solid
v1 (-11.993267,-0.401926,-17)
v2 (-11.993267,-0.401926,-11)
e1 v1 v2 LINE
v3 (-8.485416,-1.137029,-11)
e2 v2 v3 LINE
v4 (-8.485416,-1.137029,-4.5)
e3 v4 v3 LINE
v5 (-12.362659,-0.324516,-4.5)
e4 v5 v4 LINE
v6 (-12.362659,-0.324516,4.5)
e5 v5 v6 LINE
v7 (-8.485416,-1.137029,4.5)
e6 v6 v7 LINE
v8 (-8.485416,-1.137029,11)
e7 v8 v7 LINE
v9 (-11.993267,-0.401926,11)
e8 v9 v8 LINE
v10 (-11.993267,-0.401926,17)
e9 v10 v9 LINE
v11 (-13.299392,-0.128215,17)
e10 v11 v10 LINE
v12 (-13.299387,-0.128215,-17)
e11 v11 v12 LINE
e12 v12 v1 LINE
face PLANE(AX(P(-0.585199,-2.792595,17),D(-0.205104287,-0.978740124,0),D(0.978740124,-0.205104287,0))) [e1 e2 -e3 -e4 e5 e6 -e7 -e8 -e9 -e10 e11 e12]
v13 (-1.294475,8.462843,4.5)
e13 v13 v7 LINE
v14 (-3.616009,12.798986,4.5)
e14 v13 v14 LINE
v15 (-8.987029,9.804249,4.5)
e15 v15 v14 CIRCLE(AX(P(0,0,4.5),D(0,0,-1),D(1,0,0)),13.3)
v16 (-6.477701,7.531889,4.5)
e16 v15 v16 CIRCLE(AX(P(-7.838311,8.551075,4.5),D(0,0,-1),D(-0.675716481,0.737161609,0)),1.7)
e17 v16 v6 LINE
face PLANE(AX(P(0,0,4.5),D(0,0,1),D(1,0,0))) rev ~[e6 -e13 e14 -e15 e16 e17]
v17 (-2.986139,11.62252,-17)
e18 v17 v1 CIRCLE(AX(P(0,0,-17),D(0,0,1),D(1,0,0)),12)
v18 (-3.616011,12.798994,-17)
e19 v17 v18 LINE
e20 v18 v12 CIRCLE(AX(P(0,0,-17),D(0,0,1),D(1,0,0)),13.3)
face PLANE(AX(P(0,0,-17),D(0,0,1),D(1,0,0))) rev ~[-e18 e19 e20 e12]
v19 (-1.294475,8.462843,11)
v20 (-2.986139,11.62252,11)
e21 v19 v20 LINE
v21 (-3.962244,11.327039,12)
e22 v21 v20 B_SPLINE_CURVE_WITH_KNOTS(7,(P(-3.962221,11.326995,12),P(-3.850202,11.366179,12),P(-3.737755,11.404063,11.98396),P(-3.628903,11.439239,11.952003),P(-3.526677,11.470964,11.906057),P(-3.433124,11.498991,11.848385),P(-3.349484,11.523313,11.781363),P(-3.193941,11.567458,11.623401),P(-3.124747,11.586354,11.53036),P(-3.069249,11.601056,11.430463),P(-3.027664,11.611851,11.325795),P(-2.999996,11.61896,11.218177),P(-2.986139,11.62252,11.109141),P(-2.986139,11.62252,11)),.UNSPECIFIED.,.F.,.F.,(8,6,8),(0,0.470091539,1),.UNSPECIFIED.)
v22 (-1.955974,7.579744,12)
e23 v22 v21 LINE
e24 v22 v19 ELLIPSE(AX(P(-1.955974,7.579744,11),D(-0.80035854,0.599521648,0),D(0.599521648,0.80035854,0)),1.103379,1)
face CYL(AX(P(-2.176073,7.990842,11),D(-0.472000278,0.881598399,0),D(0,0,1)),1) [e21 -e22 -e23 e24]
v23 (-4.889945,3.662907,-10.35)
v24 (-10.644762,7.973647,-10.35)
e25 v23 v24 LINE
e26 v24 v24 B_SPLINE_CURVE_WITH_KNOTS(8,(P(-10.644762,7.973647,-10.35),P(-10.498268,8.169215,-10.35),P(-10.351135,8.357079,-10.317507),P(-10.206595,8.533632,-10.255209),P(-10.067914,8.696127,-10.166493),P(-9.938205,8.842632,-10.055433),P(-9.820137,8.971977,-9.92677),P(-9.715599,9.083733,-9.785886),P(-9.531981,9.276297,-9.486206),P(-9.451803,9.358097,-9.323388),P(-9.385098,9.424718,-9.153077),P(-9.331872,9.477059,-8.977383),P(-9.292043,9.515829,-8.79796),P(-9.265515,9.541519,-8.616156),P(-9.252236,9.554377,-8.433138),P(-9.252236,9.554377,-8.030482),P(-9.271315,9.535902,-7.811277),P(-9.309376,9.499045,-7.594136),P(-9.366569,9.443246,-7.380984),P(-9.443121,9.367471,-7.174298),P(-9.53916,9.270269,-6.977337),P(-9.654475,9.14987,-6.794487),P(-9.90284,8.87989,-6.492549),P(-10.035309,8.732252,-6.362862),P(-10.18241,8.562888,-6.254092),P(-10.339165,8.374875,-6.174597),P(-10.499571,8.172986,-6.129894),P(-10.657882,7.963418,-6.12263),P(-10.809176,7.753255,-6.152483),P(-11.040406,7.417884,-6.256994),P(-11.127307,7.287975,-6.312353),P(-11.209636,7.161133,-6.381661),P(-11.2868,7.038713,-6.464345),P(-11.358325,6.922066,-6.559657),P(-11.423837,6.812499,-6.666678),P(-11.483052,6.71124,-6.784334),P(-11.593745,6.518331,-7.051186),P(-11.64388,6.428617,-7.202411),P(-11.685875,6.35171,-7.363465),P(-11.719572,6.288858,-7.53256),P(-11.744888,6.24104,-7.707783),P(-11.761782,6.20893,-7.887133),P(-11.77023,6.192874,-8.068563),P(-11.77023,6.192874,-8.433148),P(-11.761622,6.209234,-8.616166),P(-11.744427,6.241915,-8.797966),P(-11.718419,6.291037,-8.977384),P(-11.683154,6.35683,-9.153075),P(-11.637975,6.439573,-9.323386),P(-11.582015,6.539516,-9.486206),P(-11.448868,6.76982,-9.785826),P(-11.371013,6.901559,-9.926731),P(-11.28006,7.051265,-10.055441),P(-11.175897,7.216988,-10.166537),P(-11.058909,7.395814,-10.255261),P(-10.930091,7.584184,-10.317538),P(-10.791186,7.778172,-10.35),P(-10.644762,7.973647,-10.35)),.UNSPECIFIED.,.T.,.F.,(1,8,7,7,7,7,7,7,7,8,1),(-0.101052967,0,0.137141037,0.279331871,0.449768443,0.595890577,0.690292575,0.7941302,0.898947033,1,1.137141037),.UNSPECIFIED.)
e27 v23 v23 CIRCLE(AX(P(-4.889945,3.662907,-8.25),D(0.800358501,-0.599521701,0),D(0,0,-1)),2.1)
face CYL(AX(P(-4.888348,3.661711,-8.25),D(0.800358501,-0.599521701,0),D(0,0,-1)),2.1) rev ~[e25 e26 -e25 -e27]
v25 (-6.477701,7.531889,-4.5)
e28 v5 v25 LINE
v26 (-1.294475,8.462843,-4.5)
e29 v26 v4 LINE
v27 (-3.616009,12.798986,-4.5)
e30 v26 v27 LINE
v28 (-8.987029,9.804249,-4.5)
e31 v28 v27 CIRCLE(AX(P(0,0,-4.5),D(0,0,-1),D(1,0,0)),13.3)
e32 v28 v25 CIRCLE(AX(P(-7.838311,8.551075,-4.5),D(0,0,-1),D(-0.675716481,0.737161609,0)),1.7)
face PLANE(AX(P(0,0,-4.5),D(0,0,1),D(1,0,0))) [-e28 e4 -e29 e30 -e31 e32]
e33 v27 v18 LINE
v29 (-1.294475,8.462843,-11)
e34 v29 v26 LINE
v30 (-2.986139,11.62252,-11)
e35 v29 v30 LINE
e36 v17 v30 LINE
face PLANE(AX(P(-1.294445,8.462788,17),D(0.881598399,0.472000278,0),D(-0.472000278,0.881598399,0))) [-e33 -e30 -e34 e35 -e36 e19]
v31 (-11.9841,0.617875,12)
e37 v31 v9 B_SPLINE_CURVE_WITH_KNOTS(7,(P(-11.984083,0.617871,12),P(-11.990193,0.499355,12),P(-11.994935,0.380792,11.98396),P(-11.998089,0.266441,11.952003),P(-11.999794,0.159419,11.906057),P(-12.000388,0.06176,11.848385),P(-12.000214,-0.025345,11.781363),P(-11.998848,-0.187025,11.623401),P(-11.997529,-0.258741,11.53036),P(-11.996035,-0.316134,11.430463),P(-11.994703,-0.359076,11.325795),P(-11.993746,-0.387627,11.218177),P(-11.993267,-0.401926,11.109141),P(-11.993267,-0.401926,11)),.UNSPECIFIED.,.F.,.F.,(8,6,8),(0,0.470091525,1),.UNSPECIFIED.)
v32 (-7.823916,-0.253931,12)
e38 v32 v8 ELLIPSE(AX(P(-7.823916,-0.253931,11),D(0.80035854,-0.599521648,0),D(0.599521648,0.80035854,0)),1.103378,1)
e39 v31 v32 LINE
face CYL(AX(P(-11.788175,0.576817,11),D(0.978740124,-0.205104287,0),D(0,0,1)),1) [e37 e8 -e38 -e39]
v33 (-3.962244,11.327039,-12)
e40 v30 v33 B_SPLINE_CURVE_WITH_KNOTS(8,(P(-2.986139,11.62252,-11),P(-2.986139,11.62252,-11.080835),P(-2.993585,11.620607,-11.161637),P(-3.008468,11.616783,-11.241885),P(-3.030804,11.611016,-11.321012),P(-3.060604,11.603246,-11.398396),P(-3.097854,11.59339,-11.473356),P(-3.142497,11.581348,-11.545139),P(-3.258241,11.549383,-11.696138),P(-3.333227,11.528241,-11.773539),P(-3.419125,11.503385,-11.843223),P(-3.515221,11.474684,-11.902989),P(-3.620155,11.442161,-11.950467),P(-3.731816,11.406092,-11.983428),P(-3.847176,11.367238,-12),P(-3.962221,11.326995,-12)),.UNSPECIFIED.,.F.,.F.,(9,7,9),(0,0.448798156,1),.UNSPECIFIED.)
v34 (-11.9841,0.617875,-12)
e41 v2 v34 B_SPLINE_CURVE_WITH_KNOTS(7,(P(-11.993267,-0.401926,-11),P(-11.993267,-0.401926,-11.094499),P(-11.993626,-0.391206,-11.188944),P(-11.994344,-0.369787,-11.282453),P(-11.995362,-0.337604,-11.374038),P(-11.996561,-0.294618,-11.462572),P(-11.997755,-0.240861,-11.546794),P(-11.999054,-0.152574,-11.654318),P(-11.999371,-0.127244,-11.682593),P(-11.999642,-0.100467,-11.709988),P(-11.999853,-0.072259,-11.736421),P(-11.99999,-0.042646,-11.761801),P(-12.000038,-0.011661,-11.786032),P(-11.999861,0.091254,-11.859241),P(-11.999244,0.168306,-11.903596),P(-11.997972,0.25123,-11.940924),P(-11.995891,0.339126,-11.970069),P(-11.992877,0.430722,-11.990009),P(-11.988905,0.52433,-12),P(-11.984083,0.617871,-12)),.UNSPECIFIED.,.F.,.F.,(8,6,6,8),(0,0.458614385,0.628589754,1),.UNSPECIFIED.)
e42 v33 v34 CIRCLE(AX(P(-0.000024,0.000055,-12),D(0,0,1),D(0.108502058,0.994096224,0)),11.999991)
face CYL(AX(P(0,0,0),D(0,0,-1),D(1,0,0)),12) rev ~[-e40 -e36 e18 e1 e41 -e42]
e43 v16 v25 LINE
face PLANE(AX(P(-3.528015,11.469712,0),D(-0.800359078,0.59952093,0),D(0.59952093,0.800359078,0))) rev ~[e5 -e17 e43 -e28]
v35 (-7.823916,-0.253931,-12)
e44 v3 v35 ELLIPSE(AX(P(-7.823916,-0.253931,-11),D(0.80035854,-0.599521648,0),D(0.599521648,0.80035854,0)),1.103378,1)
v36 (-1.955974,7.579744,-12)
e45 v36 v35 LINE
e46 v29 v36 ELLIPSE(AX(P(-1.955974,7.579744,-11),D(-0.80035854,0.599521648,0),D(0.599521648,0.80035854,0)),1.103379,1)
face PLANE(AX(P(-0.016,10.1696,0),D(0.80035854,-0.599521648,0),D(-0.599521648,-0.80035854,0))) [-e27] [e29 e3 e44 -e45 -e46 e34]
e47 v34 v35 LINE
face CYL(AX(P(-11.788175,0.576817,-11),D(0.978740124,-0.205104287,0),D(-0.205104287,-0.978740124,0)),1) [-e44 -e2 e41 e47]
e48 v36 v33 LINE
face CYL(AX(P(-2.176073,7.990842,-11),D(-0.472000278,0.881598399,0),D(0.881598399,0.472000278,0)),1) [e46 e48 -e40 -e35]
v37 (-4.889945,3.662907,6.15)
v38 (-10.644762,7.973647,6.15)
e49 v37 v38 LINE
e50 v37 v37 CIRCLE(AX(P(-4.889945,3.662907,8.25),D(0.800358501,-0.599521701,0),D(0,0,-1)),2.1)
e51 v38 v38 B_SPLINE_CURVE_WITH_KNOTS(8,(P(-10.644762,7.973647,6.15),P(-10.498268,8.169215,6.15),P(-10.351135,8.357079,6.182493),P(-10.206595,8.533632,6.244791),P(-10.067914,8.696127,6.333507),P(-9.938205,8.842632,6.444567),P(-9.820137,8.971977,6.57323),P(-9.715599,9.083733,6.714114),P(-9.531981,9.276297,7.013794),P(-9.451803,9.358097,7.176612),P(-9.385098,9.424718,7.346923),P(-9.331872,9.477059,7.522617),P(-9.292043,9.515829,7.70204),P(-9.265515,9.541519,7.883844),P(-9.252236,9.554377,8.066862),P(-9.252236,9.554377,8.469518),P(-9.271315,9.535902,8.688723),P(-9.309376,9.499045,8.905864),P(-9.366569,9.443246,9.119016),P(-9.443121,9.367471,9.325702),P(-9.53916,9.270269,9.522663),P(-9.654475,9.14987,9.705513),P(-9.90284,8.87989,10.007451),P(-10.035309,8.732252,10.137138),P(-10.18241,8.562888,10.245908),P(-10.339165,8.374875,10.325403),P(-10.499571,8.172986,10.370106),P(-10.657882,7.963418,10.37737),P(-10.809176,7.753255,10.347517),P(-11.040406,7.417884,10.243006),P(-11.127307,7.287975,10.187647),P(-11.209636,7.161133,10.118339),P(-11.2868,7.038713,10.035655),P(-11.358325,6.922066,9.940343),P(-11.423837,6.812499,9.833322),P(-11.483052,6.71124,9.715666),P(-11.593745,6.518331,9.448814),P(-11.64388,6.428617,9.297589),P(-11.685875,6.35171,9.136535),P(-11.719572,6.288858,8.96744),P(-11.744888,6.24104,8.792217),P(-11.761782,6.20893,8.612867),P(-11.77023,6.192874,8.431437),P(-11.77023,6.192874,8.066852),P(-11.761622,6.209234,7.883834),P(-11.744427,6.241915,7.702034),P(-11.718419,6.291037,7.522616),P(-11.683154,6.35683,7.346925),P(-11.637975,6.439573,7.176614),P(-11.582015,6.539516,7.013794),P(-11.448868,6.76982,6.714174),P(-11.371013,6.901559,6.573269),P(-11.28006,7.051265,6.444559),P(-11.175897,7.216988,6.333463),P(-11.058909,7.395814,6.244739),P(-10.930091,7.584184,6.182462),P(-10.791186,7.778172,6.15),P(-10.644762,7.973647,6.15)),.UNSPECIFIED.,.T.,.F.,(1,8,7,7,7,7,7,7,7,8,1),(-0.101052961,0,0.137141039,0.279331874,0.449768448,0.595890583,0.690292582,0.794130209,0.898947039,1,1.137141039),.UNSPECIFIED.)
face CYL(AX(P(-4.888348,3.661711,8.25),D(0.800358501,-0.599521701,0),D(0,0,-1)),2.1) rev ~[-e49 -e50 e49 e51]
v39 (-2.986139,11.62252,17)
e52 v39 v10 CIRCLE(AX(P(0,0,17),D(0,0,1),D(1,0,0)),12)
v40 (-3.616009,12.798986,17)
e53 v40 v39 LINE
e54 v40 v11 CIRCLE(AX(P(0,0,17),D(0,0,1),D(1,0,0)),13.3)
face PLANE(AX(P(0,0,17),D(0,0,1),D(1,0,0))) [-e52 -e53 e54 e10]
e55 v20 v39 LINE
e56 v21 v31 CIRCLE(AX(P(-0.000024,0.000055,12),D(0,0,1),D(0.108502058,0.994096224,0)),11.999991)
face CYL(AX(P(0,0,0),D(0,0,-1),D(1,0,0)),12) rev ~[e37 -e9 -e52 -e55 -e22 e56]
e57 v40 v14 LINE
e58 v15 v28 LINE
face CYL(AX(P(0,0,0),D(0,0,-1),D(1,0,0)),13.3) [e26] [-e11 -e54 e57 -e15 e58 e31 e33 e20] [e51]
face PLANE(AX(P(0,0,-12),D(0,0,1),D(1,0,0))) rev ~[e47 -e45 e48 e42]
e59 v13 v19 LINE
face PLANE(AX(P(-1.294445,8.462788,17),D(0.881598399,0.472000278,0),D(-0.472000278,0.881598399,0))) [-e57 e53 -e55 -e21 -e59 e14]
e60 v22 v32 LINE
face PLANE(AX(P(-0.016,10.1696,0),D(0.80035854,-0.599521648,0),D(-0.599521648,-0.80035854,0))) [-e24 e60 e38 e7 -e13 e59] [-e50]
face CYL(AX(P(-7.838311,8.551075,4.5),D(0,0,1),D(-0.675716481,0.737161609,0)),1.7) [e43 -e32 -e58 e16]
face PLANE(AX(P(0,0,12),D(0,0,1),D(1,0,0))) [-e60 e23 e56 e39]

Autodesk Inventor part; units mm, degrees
ref_plane "YZ Plane" through (0, 0, 0) normal (1, 0, 0) x (0, 1, 0)
ref_plane "XZ Plane" through (0, 0, 0) normal (0, 1, 0) x (-1, 0, 0)
ref_plane "XY Plane" through (0, 0, 0) normal (0, 0, 1) x (1, 0, 0)
sketch "Эскиз1" plane through (0, 0, 0) normal (0, 0, 1) x (1, 0, 0)
  arc A0 (-0.8919, 11.7662) -> (-11.5424, -2.4521) centre (0, 0) ccw projected
  line L0 (-0.016, 10.1696) -> (-9.7639, -2.8438) projected
  line L1 (-9.7639, -2.8438) -> (-12.4663, -6.4515) projected
  arc A1 (-0.8919, 11.7662) -> (-11.5424, -2.4521) centre (0, 0) ccw projected
  line L2 (2.8533, 14) -> (-0.016, 10.1696) projected
  arc A2 (-8.5159, 10.4752) -> (-12.3517, -5.4484) centre (0, 0) ccw projected
  circle A3 centre (0, 0) radius 13.5
  circle A4 centre (0, 0) radius 11.8
  circle A5 centre (0, 0) radius 13.3
  circle A6 centre (0, 0) radius 12
  line L3 (-8.1467, 14) -> (2.8533, 14) projected
  line L4 (-8.1467, 14) -> (-8.1467, 11.2511) projected
  arc A7 (-11.5424, -2.4521) -> (-9.7639, -2.8438) centre (-10.5642, -2.2443) ccw projected
  arc A8 (-0.016, 10.1696) -> (-0.8919, 11.7662) centre (-0.8163, 10.7691) ccw projected
  arc A9 (-8.5159, 10.4752) -> (-8.1467, 11.2511) centre (-9.1467, 11.2511) ccw projected
  arc A10 (-12.4663, -6.4515) -> (-12.3517, -5.4484) centre (-13.2667, -5.852) ccw projected
  arc A11 (-11.5424, -2.4521) -> (-9.7639, -2.8438) centre (-10.5642, -2.2443) ccw projected
  arc A12 (-0.016, 10.1696) -> (-0.8919, 11.7662) centre (-0.8163, 10.7691) ccw projected
  point P0 (1.1623, 11.7426)
  point P1 (2.3273, 13.2979)
  point P2 (-11.0819, -4.6034)
  point P3 (1.302, 11.9292)
  point P4 (2.1926, 13.118)
  point P5 (-11.9725, -5.7923)
  dimension "d1" = 0.2
  dimension "d2" = 0.2
extrude "Выдавливание1" add sketch "Эскиз1" along normal mid plane 34 contours A6 L1 A5 L2 picked at (-9.9488, 8.0267)
sketch "Эскиз2" plane through (0, 0, 0) normal (0, 0, 1) x (1, 0, 0)
  arc A0 (-0.8919, 11.7662) -> (-11.5424, -2.4521) centre (0, 0) ccw projected
  line L0 (-0.016, 10.1696) -> (-9.7639, -2.8438) projected
  arc A1 (1.302, 11.9292) -> (-11.0819, -4.6034) centre (0, 0) ccw projected
  line L1 (-14.5944, -9.2926) -> (2.8533, 14) projected
  arc A2 (-11.5424, -2.4521) -> (-9.7639, -2.8438) centre (-10.5642, -2.2443) ccw projected
  arc A3 (-0.016, 10.1696) -> (-0.8919, 11.7662) centre (-0.8163, 10.7691) ccw projected
  point P0 (1.1623, 11.7426)
  point P1 (-10.9422, -4.4168)
extrude "Выдавливание2" add sketch "Эскиз2" along normal mid plane 24
sketch "Эскиз3" plane through (0, 0, 0) normal (0, 0, 1) x (1, 0, 0)
  arc A0 (1.302, 11.9292) -> (-11.0819, -4.6034) centre (0, 0) ccw projected
  line L0 (-11.0819, -4.6034) -> (1.302, 11.9292) projected
  arc A1 (2.1926, 13.118) -> (-11.9725, -5.7923) centre (0, 0) ccw projected
  arc A2 (-8.5159, 10.4752) -> (-12.3517, -5.4484) centre (0, 0) ccw projected
  line L1 (1.302, 11.9292) -> (-11.0819, -4.6034) projected
  line L2 (-4.8899, 3.6629) -> (-10.8048, 8.0935)
  line L3 (-10.8048, 8.0935) -> (-7.6034, 5.6955)
  line L4 (-12.0998, -0.3072) -> (-3.107, 11.6981)
  line L5 (-3.107, 11.6981) -> (0.0944, 9.3001)
  line L6 (0.0944, 9.3001) -> (-8.8984, -2.7053)
  line L7 (-8.8984, -2.7053) -> (-12.0998, -0.3072)
  line L8 (-12.3798, -0.3474) -> (-3.1472, 11.9781)
  line L9 (-3.1472, 11.9781) -> (0.3744, 9.3402)
  line L10 (0.3744, 9.3402) -> (-8.8582, -2.9853)
  line L11 (-8.8582, -2.9853) -> (-12.3798, -0.3474)
  point P0 (-4.402, 3.2974)
  dimension "d7" = 4
  dimension "d8" = 15
  dimension "d9" = 4
  dimension "d12" = 0.2
  dimension "d13" = 15.4
extrude "Выдавливание3" cut sketch "Эскиз3" along normal mid plane 9 contours L9 L0 L5 A0 | A0 L5 L4 L8 L9 | L9 L10 L11 L0 L7 L6 L5 | L5 L0 L2 L4 A0 | A0 L4 L5 | L5 L6 L7 L0 | L4 L2 L8 A0 | L0 L7 A0 L4 L2 | L4 A0 L8 L2 | L0 L11 A0 L7 | L4 L7 A0 L11 L8 | A0 L7 L4
sketch "Эскиз5" plane through (0, 0, 17) normal (0, 0, 1) x (1, 0, 0)
  arc A0 (2.1926, 13.118) -> (-11.9725, -5.7923) centre (0, 0) ccw projected
  circle A1 centre (0, 0) radius 13.3
  line L0 (2.8533, 17.048) -> (2.8533, 14) projected
  circle A2 centre (0, 0) radius 2.8533
  line L1 (9.8804, -12.4095) -> (-5.8229, 16.921)
  line L2 (0, 0) -> (2.5154, 1.3467)
  line L3 (-19.8346, 1.2413) -> (17.8745, -6.661)
  line L4 (0, 0) -> (-0.5852, -2.7926)
  line L5 (0, 0) -> (-4.8899, 3.6629)
  line L6 (-0.2736, 9.8256) -> (-9.5063, -2.4999) projected
  point P0 (5.4035, -4.0476)
  point P1 (-13.2994, -0.1282)
  point P2 (-11.9725, -5.7923)
  point P3 (8.6469, -10.1055)
  point P4 (12.1289, -5.457)
  point P5 (-3.6161, 12.799)
  dimension "d19" = 115
  dimension "d20" = 115
extrude "Выдавливание5" cut sketch "Эскиз5" against normal blind 40 contours A1 L3 L1 A0 | L3 L1 A1 A0
sketch "Эскиз6" plane through (-8.4854, -1.137, 12) normal (0.8003585, -0.5995217, 0) x (0, 0, -1)
  line L0 (16.5, 0) -> (24, 0) projected
  line L1 (24, 11.9944) -> (24, 0) projected
  line L2 (7.5, 11.9944) -> (0, 11.9944) projected
  line L3 (0, 0) -> (0, 11.9944) projected
  line L4 (16.5, 11.9944) -> (16.5, 0) projected
  line L5 (7.5, 0) -> (7.5, 11.9944) projected
  line L6 (0, 0) -> (0, 11.9944) projected
  line L7 (0, 5.9972) -> (7.5, 5.9972)
  line L8 (7.5, 0) -> (7.5, 11.9944) projected
  line L9 (16.5, 5.9972) -> (24, 5.9972)
  circle A0 centre (3.75, 5.9972) radius 2.1
  circle A1 centre (20.25, 5.9972) radius 2.1
  line L10 (24, 11.9944) -> (16.5, 11.9944) projected
  line L11 (0, 0) -> (7.5, 0) projected
  point P0 (12, 5.9972)
  dimension "d23" = 4.2
  dimension "d24" = 4.2
extrude "Выдавливание6" cut sketch "Эскиз6" against normal blind 40 contours A1 L9 | L9 A1 | A0 L7 | L7 A0
fillet "Сопряжение2" radius 1 4 edges at (-2.1403, 10.0427, 12) (-10.2393, -0.7695, 12) (-2.1403, 10.0427, -12) (-10.2393, -0.7695, -12)
fillet "Сопряжение3" radius 5 1 edges at (-3.1643, 11.9552, 0)
fillet "Сопряжение4" radius 1.7 1 edges at (-3.6161, 12.799, 0)
properties part number "camera fixator"
